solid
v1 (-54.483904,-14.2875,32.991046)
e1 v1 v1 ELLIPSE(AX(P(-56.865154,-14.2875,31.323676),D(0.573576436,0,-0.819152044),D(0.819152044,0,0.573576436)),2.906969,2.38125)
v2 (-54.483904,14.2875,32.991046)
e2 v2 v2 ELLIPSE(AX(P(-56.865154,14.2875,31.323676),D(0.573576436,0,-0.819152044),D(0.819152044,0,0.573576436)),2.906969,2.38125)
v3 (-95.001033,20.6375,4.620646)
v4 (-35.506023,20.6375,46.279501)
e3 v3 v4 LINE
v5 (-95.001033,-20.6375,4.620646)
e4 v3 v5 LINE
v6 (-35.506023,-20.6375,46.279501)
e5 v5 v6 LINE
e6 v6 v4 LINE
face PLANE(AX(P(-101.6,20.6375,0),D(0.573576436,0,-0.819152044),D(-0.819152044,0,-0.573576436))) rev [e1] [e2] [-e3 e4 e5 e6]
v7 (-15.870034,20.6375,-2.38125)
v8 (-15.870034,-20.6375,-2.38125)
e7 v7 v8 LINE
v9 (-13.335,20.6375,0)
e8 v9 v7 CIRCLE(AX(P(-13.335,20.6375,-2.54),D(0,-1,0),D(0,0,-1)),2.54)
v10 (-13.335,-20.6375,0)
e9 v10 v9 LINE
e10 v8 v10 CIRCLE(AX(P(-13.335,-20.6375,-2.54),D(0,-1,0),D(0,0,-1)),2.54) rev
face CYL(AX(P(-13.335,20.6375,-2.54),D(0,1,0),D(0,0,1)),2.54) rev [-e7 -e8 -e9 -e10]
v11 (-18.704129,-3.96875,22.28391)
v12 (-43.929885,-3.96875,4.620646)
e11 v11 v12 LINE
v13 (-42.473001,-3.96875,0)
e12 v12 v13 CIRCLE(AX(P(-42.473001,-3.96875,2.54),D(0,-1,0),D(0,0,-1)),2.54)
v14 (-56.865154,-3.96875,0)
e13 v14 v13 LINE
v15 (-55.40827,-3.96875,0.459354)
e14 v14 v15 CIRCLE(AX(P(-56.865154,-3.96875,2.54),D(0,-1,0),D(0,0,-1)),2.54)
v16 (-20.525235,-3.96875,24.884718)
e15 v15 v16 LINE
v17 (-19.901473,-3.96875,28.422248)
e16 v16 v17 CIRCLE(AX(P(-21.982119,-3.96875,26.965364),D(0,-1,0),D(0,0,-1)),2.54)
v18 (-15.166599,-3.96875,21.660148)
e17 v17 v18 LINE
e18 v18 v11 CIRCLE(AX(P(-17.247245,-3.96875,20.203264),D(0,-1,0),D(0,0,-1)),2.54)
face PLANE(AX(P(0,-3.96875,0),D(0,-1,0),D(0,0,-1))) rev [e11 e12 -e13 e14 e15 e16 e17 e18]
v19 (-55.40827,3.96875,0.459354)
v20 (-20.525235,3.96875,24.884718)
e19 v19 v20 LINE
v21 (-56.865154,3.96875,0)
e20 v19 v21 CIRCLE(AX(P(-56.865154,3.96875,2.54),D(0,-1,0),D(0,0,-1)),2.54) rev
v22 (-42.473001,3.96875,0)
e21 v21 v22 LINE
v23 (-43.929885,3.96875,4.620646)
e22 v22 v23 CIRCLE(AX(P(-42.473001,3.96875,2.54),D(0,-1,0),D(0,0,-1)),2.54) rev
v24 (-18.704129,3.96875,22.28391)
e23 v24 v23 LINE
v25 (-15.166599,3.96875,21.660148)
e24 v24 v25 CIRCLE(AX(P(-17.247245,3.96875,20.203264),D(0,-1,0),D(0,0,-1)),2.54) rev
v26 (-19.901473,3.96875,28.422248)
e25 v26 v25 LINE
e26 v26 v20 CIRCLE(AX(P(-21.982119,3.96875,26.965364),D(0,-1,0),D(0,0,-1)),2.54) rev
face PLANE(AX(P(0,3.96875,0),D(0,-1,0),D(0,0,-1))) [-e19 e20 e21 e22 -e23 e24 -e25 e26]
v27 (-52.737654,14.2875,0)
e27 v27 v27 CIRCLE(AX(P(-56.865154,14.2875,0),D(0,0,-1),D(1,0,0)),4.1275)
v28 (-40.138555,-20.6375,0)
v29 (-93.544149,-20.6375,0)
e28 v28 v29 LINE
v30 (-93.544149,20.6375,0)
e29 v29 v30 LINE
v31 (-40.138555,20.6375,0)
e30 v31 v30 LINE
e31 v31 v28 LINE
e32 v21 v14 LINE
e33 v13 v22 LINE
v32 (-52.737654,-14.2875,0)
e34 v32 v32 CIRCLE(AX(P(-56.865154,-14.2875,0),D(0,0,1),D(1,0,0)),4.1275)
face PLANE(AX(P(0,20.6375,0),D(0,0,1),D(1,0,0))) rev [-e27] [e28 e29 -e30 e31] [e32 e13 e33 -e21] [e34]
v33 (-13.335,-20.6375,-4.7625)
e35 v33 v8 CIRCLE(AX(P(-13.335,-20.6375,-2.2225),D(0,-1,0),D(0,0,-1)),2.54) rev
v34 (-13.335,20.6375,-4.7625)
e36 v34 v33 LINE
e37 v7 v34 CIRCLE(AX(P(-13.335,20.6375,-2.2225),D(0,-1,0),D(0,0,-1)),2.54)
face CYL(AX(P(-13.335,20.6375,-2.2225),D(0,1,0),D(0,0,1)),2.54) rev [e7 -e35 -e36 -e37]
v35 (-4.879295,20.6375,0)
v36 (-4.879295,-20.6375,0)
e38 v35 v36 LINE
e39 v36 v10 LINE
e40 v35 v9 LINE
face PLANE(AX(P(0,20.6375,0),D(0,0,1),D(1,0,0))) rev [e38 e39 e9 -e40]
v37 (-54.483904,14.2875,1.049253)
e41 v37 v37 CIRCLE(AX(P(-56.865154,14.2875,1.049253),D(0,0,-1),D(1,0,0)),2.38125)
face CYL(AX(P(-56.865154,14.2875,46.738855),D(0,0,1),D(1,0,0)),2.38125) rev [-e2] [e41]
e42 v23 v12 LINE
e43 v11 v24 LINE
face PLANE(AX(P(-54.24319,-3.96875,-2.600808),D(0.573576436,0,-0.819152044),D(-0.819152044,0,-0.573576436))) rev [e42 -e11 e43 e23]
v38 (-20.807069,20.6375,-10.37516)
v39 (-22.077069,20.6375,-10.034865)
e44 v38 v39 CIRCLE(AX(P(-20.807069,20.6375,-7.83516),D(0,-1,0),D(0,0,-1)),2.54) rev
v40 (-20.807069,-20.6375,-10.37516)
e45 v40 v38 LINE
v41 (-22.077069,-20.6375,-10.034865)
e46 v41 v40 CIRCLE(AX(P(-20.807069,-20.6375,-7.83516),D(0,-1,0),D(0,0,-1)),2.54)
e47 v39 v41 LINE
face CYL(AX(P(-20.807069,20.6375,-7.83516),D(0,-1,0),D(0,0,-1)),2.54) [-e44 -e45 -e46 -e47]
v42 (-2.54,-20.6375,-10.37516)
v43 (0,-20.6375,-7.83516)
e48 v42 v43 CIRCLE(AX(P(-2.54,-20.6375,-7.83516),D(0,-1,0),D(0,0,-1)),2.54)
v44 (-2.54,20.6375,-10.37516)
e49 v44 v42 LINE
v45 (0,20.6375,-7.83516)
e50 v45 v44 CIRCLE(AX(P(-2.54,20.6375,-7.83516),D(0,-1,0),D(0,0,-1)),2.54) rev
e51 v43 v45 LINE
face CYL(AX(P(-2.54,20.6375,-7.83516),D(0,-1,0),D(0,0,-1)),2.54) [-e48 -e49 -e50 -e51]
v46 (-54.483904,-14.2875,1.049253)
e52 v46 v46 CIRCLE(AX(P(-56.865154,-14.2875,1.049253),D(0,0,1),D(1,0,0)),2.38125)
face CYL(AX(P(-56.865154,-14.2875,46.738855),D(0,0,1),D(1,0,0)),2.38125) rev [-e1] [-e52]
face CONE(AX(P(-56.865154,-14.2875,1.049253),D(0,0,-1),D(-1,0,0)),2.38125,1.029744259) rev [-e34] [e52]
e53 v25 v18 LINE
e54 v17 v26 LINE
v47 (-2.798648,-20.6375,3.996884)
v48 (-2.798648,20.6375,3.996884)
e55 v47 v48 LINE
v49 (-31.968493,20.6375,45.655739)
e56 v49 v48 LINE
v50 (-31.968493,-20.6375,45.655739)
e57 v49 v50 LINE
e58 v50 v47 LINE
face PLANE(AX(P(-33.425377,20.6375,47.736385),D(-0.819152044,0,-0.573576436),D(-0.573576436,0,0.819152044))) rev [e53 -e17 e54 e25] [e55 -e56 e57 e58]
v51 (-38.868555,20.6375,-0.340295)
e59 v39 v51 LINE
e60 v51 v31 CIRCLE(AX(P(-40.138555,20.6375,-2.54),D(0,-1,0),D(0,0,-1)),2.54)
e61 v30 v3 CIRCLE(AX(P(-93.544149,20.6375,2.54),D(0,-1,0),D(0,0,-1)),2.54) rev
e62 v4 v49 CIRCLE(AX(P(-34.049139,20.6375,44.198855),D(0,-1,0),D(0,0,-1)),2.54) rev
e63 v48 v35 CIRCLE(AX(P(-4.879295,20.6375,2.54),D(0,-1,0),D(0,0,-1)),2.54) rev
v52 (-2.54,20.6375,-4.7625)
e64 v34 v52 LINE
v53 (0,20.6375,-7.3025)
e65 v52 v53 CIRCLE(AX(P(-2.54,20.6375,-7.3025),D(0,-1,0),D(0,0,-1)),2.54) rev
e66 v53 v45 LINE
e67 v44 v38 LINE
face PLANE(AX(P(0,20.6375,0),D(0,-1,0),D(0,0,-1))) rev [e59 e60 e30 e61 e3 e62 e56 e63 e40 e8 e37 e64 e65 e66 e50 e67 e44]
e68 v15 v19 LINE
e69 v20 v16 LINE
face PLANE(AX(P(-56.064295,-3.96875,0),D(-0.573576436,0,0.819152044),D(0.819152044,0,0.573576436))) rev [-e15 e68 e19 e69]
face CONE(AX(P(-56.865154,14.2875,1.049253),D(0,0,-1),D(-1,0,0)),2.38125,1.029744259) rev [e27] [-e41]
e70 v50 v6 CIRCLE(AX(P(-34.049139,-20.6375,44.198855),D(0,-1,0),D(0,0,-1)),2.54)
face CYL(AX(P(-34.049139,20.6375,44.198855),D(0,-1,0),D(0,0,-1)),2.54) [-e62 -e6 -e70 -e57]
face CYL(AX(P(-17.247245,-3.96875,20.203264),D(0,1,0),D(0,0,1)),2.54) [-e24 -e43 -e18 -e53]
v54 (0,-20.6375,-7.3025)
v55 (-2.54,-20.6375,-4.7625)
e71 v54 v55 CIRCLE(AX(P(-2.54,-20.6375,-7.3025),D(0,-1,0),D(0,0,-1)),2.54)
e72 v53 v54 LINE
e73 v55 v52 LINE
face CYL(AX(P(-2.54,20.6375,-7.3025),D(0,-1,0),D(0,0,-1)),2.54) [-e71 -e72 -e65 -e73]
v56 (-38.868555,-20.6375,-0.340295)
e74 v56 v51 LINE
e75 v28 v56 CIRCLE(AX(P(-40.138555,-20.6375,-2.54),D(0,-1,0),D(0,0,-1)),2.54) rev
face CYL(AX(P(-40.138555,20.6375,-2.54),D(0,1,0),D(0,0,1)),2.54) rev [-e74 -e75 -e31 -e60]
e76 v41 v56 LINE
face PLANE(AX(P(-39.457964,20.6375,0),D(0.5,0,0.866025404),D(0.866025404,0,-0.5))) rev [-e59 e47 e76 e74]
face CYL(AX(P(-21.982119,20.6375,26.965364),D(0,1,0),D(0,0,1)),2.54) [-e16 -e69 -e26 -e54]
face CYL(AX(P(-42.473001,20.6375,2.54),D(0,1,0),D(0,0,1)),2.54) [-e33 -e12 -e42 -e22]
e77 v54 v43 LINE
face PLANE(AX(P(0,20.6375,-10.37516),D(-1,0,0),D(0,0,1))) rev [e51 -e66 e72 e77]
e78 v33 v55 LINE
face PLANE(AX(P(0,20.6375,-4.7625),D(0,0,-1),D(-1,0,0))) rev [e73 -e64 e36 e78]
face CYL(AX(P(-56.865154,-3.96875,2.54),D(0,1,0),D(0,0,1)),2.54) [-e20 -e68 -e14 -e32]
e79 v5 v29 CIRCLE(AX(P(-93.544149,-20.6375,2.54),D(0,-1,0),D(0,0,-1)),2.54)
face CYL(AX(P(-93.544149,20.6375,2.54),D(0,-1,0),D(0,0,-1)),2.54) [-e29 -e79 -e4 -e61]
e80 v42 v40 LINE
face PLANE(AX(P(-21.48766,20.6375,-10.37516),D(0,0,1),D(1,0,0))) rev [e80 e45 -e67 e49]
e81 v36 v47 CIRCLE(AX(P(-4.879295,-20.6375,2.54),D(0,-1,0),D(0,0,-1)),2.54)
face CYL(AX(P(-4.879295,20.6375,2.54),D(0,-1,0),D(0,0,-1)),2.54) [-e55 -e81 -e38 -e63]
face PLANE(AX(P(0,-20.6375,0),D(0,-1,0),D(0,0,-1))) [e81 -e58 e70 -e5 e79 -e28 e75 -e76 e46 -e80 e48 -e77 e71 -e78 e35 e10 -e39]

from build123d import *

# Parameters (mm, degrees)
BOSS_EXTRUDE1_DEPTH = 20.6375
BOSS_EXTRUDE2_DEPTH = 20.6375
CUT_EXTRUDE1_DEPTH  = 3.96875
FILLET1_R           = 2.54


with BuildPart() as part:
    # Sketch3 → Boss-Extrude1 (new, symmetric)
    with BuildSketch(Plane(origin=(0, 0, 0), x_dir=(1, 0, 0), z_dir=(0, 1, 0))):
        Polygon((0, 0), (-101.6, 0), (-33.425376719, -47.736385136), align=None)
    extrude(amount=BOSS_EXTRUDE1_DEPTH, both=True)

    # Sketch1 → Boss-Extrude2 (add, symmetric)
    with BuildSketch(Plane(origin=(0, 0, 0), x_dir=(1, 0, 0), z_dir=(0, 1, 0))):
        Polygon((-21.487660076, 10.375160076), (0, 10.375160076), (0, 4.7625), (-15.875, 4.7625), (-15.875, 0), (-39.457964463, 0), align=None)
    extrude(amount=BOSS_EXTRUDE2_DEPTH, both=True)

    # Sketch5 → Cut-Extrude1 (cut, symmetric)
    with BuildSketch(Plane(origin=(0, 0, 0), x_dir=(1, 0, 0), z_dir=(0, 1, 0))):
        Polygon((-56.064295192, 0), (-18.444588457, -26.341602241), (-16.623483272, -23.7407945), (-54.243190006, 2.600807741), align=None)
    extrude(amount=CUT_EXTRUDE1_DEPTH, both=True, mode=Mode.SUBTRACT)

    # Fillet1
    # the kernel refuses this fillet: 2.54 mm, written as the material it adds along each edge
    with BuildSketch(Plane(origin=(-15.875, 20.6375, -4.7625), x_dir=(0, 0, 1), z_dir=(0, -1, 0))) as fillet1_piece_1:
        with BuildLine():
            CenterArc((FILLET1_R, -FILLET1_R), FILLET1_R, 90, 90)
            Line((0, -FILLET1_R), (0, 0))
            Line((0, 0), (FILLET1_R, 0))
        make_face()
    extrude(amount=41.275)
    with BuildSketch(Plane(origin=(-15.875, -20.6375, 0), x_dir=(1, 0, 0), z_dir=(0, 1, 0))) as fillet1_piece_2:
        with BuildLine():
            CenterArc((FILLET1_R, FILLET1_R), FILLET1_R, 180, 90)
            Line((0, FILLET1_R), (0, 0))
            Line((0, 0), (FILLET1_R, 0))
        make_face()
    extrude(amount=41.275)
    with BuildSketch(Plane(origin=(-39.457964463, -20.6375, 0), x_dir=(0.8660254037844413, 0, -0.49999999999999567), z_dir=(0, 1, 0))) as fillet1_piece_3:
        with BuildLine():
            CenterArc((FILLET1_R * 0.267949192431, FILLET1_R), FILLET1_R, 240, 30)
            Line((-FILLET1_R * 0.232050807569, FILLET1_R * 0.133974596216), (0, 0))
            Line((0, 0), (FILLET1_R * 0.267949192431, 0))
        make_face()
    extrude(amount=41.275)
    # the kernel refuses this fillet: 2.54 mm, written as the material it takes off along each edge
    with BuildSketch(Plane(origin=(-56.064295192, 3.96875, 0), x_dir=(-1, 0, 0), z_dir=(0, -1, 0))) as fillet1_2_piece_1:
        with BuildLine():
            CenterArc((FILLET1_R * 0.315298788879, -FILLET1_R), FILLET1_R, 90, 35)
            Line((-FILLET1_R * 0.258277647472, -FILLET1_R * 0.180847955711), (0, 0))
            Line((0, 0), (FILLET1_R * 0.315298788879, 0))
        make_face()
    extrude(amount=7.9375, mode=Mode.SUBTRACT)
    with BuildSketch(Plane(origin=(-50.528851616, 3.96875, 0), x_dir=(1, 0, 0), z_dir=(0, -1, 0))) as fillet1_2_piece_2:
        with BuildLine():
            CenterArc((FILLET1_R * 3.17159480236, FILLET1_R), FILLET1_R, 125, 145)
            Line((FILLET1_R * 2.59801836601, FILLET1_R * 1.81915204429), (0, 0))
            Line((0, 0), (FILLET1_R * 3.17159480236, 0))
        make_face()
    extrude(amount=7.9375, mode=Mode.SUBTRACT)
    with BuildSketch(Plane(origin=(-18.444588457, -3.96875, 26.341602241), x_dir=(-0.5735764363510412, 0, 0.8191520442889952), z_dir=(0, 1, 0))) as fillet1_2_piece_3:
        with BuildLine():
            CenterArc((FILLET1_R, -FILLET1_R), FILLET1_R, 90, 90)
            Line((0, -FILLET1_R), (0, 0))
            Line((0, 0), (FILLET1_R, 0))
        make_face()
    extrude(amount=7.9375, mode=Mode.SUBTRACT)
    with BuildSketch(Plane(origin=(-16.623483272, -3.96875, 23.7407945), x_dir=(0.573576436351041, 0, -0.8191520442889954), z_dir=(0, 1, 0))) as fillet1_2_piece_4:
        with BuildLine():
            CenterArc((FILLET1_R, FILLET1_R), FILLET1_R, 180, 90)
            Line((0, FILLET1_R), (0, 0))
            Line((0, 0), (FILLET1_R, 0))
        make_face()
    extrude(amount=7.9375, mode=Mode.SUBTRACT)
    with BuildSketch(Plane(origin=(0, 32.835736506, 0), x_dir=(-1, 0, 0), z_dir=(0, -1, 0))) as fillet1_2_piece_5:
        with BuildLine():
            CenterArc((FILLET1_R * 1.92098212697, -FILLET1_R), FILLET1_R, 90, 125)
            Line((FILLET1_R * 1.10183008268, -FILLET1_R * 1.57357643635), (0, 0))
            Line((0, 0), (FILLET1_R * 1.92098212697, 0))
        make_face()
    extrude(amount=65.671473013, mode=Mode.SUBTRACT)
    with BuildSketch(Plane(origin=(0, 26.9875, -4.7625), x_dir=(-1, 0, 0), z_dir=(0, -1, 0)), Plane(origin=(0, 26.9875, -10.375160076), x_dir=(0, 0, 1), z_dir=(0, -1, 0))) as fillet1_2_piece_6:
        with BuildLine():
            CenterArc((FILLET1_R, FILLET1_R), FILLET1_R, 180, 90)
            Line((0, FILLET1_R), (0, 0))
            Line((0, 0), (FILLET1_R, 0))
        make_face()
    extrude(amount=53.975, mode=Mode.SUBTRACT)
    with BuildSketch(Plane(origin=(-21.487660076, -22.338977372, -10.375160076), x_dir=(1, 0, 0), z_dir=(0, 1, 0))) as fillet1_2_piece_7:
        with BuildLine():
            CenterArc((FILLET1_R * 0.267949192431, -FILLET1_R), FILLET1_R, 90, 30)
            Line((-FILLET1_R * 0.232050807569, -FILLET1_R * 0.133974596216), (0, 0))
            Line((0, 0), (FILLET1_R * 0.267949192431, 0))
        make_face()
    extrude(amount=44.677954744, mode=Mode.SUBTRACT)
    with BuildSketch(Plane(origin=(-33.425376719, 26.9875, 47.736385136), x_dir=(0.5735764363510407, 0, -0.8191520442889956), z_dir=(0, -1, 0))) as fillet1_2_piece_8:
        with BuildLine():
            CenterArc((FILLET1_R, -FILLET1_R), FILLET1_R, 90, 90)
            Line((0, -FILLET1_R), (0, 0))
            Line((0, 0), (FILLET1_R, 0))
        make_face()
    extrude(amount=53.975, mode=Mode.SUBTRACT)
    with BuildSketch(Plane(origin=(-101.6, -40.777126995, 0), x_dir=(1, 0, 0), z_dir=(0, 1, 0))) as fillet1_2_piece_9:
        with BuildLine():
            CenterArc((FILLET1_R * 3.17159480236, -FILLET1_R), FILLET1_R, 90, 145)
            Line((FILLET1_R * 2.59801836601, -FILLET1_R * 1.81915204429), (0, 0))
            Line((0, 0), (FILLET1_R * 3.17159480236, 0))
        make_face()
    extrude(amount=81.55425399, mode=Mode.SUBTRACT)

    # Sketch7 → Cut-Revolve1 (revolve, cut)
    with BuildSketch(Plane(origin=(-56.865154115, 0, 0), x_dir=(0, 0, -1), z_dir=(1, 0, 0)), mode=Mode.PRIVATE) as cut_revolve1_sk:
        Polygon((0, -18.415), (-1.049252856, -16.66875), (-46.738854795, -16.66875), (-46.738854795, -14.2875), (0, -14.2875), align=None)
    cut_revolve1 = revolve(cut_revolve1_sk.sketch.rotate(Axis((-56.865154115, -14.2875, 46.738854795), (0, 0, -1)), 270), axis=Axis((-56.865154115, -14.2875, 46.738854795), (0, 0, -1)), mode=Mode.SUBTRACT)

    # Mirror1: Cut-Revolve1 across plane
    add(cut_revolve1.mirror(Plane.ZX), mode=Mode.SUBTRACT)


solid = part.part
